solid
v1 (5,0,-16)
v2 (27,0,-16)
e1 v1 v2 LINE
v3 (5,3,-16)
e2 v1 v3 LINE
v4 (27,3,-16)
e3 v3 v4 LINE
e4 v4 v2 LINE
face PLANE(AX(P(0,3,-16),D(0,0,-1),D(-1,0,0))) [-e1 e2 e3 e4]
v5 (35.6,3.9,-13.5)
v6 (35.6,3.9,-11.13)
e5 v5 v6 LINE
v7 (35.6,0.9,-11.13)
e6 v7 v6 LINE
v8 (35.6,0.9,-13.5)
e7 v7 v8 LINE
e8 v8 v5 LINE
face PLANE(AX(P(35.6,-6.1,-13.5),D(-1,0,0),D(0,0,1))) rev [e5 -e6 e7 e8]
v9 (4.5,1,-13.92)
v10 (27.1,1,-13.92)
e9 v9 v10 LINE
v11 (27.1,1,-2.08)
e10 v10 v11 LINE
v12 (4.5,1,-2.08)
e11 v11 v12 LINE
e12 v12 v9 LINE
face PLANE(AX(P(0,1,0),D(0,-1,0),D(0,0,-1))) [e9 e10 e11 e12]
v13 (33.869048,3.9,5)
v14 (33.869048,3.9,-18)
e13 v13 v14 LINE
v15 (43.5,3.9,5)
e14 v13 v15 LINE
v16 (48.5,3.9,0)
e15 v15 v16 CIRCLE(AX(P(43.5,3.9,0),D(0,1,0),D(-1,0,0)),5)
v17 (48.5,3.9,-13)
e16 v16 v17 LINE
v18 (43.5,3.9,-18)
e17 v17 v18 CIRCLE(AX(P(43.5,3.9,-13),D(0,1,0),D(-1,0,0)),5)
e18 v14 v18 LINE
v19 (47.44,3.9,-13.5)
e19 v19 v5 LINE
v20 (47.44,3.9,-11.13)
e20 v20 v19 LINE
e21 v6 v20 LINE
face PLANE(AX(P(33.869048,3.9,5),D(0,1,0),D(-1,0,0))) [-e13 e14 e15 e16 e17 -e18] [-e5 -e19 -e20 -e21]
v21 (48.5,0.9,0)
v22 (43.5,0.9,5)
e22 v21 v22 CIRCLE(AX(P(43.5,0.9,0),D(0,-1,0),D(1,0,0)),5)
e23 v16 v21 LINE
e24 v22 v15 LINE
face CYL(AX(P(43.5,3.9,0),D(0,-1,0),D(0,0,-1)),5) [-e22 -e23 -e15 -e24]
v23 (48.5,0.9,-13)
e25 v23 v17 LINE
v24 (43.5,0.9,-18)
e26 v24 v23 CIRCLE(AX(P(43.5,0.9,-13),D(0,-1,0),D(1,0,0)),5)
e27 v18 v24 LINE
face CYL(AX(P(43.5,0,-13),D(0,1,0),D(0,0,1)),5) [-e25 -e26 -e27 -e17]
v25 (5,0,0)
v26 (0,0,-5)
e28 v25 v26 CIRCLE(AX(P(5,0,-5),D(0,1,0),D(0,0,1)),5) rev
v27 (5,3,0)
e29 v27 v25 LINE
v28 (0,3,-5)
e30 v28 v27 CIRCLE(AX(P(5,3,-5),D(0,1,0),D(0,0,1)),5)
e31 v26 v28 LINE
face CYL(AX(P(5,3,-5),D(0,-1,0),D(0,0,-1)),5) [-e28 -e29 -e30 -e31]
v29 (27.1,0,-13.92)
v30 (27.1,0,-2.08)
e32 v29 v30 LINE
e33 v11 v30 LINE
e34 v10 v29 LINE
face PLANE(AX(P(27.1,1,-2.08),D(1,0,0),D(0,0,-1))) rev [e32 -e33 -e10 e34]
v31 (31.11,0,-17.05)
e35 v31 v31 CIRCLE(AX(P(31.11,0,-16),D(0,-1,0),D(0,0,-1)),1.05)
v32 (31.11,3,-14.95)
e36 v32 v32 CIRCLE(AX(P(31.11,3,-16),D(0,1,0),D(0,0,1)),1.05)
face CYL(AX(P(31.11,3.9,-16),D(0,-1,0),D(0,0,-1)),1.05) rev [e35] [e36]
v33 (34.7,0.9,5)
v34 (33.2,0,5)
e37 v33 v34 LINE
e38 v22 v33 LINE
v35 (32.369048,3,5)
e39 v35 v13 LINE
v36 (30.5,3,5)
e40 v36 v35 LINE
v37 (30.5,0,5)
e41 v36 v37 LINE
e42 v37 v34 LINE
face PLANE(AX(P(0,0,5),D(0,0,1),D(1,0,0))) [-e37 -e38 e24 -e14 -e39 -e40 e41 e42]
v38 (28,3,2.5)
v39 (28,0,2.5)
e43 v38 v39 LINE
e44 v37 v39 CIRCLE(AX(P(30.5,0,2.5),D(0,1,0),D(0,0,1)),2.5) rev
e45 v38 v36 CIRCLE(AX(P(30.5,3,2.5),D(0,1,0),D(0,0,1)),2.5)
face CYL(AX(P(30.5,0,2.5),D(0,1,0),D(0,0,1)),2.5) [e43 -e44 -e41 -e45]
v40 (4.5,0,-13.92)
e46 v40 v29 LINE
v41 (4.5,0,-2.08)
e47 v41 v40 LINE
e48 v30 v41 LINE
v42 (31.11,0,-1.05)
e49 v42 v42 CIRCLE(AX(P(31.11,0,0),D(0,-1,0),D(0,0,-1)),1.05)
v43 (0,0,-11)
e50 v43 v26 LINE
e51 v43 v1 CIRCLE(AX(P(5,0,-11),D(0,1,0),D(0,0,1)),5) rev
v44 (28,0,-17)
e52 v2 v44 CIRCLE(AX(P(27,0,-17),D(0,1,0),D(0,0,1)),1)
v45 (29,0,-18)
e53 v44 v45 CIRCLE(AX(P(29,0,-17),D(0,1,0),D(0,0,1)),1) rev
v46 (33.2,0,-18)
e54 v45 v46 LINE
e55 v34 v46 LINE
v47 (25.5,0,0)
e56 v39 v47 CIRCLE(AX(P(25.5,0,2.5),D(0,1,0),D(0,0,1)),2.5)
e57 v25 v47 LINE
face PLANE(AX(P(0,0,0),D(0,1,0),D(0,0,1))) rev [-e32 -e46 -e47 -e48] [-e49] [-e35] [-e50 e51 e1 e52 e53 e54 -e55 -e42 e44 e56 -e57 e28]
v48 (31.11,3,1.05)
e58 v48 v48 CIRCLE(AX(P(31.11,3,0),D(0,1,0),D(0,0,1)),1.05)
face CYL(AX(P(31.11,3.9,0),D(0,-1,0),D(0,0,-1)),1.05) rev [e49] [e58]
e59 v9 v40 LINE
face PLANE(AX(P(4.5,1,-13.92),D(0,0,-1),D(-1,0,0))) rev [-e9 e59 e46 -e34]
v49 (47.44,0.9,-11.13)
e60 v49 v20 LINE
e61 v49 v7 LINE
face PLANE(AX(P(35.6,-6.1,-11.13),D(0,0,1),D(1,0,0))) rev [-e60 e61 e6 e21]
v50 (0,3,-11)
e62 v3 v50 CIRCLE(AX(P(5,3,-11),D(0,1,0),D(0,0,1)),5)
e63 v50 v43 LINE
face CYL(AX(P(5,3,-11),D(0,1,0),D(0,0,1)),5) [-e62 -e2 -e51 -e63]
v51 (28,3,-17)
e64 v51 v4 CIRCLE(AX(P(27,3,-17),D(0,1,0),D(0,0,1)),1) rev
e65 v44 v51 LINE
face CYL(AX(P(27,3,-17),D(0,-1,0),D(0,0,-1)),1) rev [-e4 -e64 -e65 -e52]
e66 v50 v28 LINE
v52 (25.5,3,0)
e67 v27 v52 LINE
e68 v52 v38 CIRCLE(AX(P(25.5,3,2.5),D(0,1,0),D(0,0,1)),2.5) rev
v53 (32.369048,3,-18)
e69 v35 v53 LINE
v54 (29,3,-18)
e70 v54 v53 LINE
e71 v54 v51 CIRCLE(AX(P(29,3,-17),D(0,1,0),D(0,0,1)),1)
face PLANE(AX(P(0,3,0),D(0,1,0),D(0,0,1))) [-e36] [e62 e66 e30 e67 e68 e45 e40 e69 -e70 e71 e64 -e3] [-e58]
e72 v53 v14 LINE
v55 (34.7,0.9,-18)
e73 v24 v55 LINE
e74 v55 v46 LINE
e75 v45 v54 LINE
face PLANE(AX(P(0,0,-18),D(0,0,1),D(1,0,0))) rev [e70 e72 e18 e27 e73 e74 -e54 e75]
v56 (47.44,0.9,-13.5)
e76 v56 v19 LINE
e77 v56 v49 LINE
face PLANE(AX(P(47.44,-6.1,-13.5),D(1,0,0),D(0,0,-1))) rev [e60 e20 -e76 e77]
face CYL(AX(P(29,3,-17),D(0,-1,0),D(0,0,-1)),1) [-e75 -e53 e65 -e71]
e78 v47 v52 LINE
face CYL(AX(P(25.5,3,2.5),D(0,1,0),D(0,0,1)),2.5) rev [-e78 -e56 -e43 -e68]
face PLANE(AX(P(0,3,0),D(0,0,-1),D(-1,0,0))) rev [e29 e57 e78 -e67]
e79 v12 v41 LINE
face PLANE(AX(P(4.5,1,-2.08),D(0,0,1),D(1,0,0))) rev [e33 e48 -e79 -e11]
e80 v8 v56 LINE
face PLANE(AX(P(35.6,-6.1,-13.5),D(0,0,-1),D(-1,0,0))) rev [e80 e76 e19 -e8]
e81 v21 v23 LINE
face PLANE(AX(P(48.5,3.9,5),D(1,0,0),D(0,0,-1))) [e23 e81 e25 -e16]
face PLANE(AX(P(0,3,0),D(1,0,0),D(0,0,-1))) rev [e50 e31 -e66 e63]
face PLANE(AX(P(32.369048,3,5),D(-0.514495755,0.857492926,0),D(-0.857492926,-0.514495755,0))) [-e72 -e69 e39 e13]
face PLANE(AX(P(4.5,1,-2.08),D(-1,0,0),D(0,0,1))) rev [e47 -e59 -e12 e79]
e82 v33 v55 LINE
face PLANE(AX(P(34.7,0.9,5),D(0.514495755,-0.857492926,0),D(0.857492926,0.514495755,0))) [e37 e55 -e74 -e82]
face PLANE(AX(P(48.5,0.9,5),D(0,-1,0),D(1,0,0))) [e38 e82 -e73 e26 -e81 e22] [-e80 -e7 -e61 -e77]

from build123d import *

# Parameters (mm, degrees)
SKETCH1_W               = 28
SKETCH1_H               = 16
BOSS_EXTRUDE1_DEPTH     = 3
BOSS_EXTRU_1_DEPTH      = 5
BOSS_EXTRU_1_DEPTH_BACK = 18
ESQUISSE8_W             = 11.84
ESQUISSE8_H             = 2.37
ENL_V_MAT_EXTRU_4_DEPTH = 10
ESQUISSE9_W             = 22.6
ESQUISSE9_H             = 11.84
ENL_V_MAT_EXTRU_5_DEPTH = 1
ESQUISSE10_R            = 1.05
ENL_V_MAT_EXTRU_6_DEPTH = 52.879282956
CONG_3_R                = 1
CONG_4_R                = 5
CONG_5_R                = 2.5


with BuildPart() as part:
    # Sketch1 → Boss-Extrude1 (new body)
    with BuildSketch(Plane(origin=(0, 0, 0), x_dir=(1, 0, 0), z_dir=(0, 1, 0))):
        with Locations((14, 8)):
            Rectangle(SKETCH1_W, SKETCH1_H)
    extrude(amount=BOSS_EXTRUDE1_DEPTH)

    # Esquisse1 → Boss.-Extru.1 (add, two sides: drawn at the far end of the back side and taken through both)
    with BuildSketch(Plane.XY.offset(-BOSS_EXTRU_1_DEPTH_BACK)):
        Polygon((32.369048105, 3), (33.869048105, 3.9), (48.5, 3.9), (48.5, 0.9), (34.7, 0.9), (33.2, 0), (28, 0), (28, 3), align=None)
    extrude(amount=BOSS_EXTRU_1_DEPTH + BOSS_EXTRU_1_DEPTH_BACK)

    # Esquisse8 → Enlèv. mat.-Extru.4 (cut)
    with BuildSketch(Plane(origin=(0, 3.9, 0), x_dir=(1, 0, 0), z_dir=(0, 1, 0))):
        with Locations((41.52, 12.315)):
            Rectangle(ESQUISSE8_W, ESQUISSE8_H)
    extrude(amount=-ENL_V_MAT_EXTRU_4_DEPTH, mode=Mode.SUBTRACT)

    # Esquisse9 → Enlèv. mat.-Extru.5 (cut)
    with BuildSketch(Plane.XZ):
        with Locations((15.8, -8)):
            Rectangle(ESQUISSE9_W, ESQUISSE9_H)
    extrude(amount=-ENL_V_MAT_EXTRU_5_DEPTH, mode=Mode.SUBTRACT)

    # Esquisse10 → Enlèv. mat.-Extru.6 (cut, through all)
    with BuildSketch(Plane.XZ):
        with Locations(Location((31.11, 0, 0), (0, 0, 270))):
            Circle(ESQUISSE10_R)
        with Locations(Location((31.11, -16, 0), (0, 0, 270))):
            Circle(ESQUISSE10_R)
    extrude(amount=-ENL_V_MAT_EXTRU_6_DEPTH, mode=Mode.SUBTRACT)

    # Congé3
    cong_3_edges = [part.edges().sort_by_distance(p)[0] for p in [
        (28, 1.5, -16),
    ]]
    fillet(cong_3_edges, radius=CONG_3_R)
    cong_3_2_edges = [part.edges().sort_by_distance(p)[0] for p in [
        (28, 1.5, -18),
    ]]
    fillet(cong_3_2_edges, radius=CONG_3_R - 0.0001)  # a hair under: the kernel refuses the full size

    # Congé4
    cong_4_edges = [part.edges().sort_by_distance(p)[0] for p in [
        (48.5, 2.4, -18),
        (48.5, 2.4, 5),
        (0, 1.5, 0),
        (0, 1.5, -16),
    ]]
    fillet(cong_4_edges, radius=CONG_4_R)

    # Congé5
    cong_5_edges = [part.edges().sort_by_distance(p)[0] for p in [
        (28, 1.5, 0),
    ]]
    fillet(cong_5_edges, radius=CONG_5_R)
    cong_5_2_edges = [part.edges().sort_by_distance(p)[0] for p in [
        (28, 1.5, 5),
    ]]
    fillet(cong_5_2_edges, radius=CONG_5_R - 0.0001)  # a hair under: the kernel refuses the full size


solid = part.part
